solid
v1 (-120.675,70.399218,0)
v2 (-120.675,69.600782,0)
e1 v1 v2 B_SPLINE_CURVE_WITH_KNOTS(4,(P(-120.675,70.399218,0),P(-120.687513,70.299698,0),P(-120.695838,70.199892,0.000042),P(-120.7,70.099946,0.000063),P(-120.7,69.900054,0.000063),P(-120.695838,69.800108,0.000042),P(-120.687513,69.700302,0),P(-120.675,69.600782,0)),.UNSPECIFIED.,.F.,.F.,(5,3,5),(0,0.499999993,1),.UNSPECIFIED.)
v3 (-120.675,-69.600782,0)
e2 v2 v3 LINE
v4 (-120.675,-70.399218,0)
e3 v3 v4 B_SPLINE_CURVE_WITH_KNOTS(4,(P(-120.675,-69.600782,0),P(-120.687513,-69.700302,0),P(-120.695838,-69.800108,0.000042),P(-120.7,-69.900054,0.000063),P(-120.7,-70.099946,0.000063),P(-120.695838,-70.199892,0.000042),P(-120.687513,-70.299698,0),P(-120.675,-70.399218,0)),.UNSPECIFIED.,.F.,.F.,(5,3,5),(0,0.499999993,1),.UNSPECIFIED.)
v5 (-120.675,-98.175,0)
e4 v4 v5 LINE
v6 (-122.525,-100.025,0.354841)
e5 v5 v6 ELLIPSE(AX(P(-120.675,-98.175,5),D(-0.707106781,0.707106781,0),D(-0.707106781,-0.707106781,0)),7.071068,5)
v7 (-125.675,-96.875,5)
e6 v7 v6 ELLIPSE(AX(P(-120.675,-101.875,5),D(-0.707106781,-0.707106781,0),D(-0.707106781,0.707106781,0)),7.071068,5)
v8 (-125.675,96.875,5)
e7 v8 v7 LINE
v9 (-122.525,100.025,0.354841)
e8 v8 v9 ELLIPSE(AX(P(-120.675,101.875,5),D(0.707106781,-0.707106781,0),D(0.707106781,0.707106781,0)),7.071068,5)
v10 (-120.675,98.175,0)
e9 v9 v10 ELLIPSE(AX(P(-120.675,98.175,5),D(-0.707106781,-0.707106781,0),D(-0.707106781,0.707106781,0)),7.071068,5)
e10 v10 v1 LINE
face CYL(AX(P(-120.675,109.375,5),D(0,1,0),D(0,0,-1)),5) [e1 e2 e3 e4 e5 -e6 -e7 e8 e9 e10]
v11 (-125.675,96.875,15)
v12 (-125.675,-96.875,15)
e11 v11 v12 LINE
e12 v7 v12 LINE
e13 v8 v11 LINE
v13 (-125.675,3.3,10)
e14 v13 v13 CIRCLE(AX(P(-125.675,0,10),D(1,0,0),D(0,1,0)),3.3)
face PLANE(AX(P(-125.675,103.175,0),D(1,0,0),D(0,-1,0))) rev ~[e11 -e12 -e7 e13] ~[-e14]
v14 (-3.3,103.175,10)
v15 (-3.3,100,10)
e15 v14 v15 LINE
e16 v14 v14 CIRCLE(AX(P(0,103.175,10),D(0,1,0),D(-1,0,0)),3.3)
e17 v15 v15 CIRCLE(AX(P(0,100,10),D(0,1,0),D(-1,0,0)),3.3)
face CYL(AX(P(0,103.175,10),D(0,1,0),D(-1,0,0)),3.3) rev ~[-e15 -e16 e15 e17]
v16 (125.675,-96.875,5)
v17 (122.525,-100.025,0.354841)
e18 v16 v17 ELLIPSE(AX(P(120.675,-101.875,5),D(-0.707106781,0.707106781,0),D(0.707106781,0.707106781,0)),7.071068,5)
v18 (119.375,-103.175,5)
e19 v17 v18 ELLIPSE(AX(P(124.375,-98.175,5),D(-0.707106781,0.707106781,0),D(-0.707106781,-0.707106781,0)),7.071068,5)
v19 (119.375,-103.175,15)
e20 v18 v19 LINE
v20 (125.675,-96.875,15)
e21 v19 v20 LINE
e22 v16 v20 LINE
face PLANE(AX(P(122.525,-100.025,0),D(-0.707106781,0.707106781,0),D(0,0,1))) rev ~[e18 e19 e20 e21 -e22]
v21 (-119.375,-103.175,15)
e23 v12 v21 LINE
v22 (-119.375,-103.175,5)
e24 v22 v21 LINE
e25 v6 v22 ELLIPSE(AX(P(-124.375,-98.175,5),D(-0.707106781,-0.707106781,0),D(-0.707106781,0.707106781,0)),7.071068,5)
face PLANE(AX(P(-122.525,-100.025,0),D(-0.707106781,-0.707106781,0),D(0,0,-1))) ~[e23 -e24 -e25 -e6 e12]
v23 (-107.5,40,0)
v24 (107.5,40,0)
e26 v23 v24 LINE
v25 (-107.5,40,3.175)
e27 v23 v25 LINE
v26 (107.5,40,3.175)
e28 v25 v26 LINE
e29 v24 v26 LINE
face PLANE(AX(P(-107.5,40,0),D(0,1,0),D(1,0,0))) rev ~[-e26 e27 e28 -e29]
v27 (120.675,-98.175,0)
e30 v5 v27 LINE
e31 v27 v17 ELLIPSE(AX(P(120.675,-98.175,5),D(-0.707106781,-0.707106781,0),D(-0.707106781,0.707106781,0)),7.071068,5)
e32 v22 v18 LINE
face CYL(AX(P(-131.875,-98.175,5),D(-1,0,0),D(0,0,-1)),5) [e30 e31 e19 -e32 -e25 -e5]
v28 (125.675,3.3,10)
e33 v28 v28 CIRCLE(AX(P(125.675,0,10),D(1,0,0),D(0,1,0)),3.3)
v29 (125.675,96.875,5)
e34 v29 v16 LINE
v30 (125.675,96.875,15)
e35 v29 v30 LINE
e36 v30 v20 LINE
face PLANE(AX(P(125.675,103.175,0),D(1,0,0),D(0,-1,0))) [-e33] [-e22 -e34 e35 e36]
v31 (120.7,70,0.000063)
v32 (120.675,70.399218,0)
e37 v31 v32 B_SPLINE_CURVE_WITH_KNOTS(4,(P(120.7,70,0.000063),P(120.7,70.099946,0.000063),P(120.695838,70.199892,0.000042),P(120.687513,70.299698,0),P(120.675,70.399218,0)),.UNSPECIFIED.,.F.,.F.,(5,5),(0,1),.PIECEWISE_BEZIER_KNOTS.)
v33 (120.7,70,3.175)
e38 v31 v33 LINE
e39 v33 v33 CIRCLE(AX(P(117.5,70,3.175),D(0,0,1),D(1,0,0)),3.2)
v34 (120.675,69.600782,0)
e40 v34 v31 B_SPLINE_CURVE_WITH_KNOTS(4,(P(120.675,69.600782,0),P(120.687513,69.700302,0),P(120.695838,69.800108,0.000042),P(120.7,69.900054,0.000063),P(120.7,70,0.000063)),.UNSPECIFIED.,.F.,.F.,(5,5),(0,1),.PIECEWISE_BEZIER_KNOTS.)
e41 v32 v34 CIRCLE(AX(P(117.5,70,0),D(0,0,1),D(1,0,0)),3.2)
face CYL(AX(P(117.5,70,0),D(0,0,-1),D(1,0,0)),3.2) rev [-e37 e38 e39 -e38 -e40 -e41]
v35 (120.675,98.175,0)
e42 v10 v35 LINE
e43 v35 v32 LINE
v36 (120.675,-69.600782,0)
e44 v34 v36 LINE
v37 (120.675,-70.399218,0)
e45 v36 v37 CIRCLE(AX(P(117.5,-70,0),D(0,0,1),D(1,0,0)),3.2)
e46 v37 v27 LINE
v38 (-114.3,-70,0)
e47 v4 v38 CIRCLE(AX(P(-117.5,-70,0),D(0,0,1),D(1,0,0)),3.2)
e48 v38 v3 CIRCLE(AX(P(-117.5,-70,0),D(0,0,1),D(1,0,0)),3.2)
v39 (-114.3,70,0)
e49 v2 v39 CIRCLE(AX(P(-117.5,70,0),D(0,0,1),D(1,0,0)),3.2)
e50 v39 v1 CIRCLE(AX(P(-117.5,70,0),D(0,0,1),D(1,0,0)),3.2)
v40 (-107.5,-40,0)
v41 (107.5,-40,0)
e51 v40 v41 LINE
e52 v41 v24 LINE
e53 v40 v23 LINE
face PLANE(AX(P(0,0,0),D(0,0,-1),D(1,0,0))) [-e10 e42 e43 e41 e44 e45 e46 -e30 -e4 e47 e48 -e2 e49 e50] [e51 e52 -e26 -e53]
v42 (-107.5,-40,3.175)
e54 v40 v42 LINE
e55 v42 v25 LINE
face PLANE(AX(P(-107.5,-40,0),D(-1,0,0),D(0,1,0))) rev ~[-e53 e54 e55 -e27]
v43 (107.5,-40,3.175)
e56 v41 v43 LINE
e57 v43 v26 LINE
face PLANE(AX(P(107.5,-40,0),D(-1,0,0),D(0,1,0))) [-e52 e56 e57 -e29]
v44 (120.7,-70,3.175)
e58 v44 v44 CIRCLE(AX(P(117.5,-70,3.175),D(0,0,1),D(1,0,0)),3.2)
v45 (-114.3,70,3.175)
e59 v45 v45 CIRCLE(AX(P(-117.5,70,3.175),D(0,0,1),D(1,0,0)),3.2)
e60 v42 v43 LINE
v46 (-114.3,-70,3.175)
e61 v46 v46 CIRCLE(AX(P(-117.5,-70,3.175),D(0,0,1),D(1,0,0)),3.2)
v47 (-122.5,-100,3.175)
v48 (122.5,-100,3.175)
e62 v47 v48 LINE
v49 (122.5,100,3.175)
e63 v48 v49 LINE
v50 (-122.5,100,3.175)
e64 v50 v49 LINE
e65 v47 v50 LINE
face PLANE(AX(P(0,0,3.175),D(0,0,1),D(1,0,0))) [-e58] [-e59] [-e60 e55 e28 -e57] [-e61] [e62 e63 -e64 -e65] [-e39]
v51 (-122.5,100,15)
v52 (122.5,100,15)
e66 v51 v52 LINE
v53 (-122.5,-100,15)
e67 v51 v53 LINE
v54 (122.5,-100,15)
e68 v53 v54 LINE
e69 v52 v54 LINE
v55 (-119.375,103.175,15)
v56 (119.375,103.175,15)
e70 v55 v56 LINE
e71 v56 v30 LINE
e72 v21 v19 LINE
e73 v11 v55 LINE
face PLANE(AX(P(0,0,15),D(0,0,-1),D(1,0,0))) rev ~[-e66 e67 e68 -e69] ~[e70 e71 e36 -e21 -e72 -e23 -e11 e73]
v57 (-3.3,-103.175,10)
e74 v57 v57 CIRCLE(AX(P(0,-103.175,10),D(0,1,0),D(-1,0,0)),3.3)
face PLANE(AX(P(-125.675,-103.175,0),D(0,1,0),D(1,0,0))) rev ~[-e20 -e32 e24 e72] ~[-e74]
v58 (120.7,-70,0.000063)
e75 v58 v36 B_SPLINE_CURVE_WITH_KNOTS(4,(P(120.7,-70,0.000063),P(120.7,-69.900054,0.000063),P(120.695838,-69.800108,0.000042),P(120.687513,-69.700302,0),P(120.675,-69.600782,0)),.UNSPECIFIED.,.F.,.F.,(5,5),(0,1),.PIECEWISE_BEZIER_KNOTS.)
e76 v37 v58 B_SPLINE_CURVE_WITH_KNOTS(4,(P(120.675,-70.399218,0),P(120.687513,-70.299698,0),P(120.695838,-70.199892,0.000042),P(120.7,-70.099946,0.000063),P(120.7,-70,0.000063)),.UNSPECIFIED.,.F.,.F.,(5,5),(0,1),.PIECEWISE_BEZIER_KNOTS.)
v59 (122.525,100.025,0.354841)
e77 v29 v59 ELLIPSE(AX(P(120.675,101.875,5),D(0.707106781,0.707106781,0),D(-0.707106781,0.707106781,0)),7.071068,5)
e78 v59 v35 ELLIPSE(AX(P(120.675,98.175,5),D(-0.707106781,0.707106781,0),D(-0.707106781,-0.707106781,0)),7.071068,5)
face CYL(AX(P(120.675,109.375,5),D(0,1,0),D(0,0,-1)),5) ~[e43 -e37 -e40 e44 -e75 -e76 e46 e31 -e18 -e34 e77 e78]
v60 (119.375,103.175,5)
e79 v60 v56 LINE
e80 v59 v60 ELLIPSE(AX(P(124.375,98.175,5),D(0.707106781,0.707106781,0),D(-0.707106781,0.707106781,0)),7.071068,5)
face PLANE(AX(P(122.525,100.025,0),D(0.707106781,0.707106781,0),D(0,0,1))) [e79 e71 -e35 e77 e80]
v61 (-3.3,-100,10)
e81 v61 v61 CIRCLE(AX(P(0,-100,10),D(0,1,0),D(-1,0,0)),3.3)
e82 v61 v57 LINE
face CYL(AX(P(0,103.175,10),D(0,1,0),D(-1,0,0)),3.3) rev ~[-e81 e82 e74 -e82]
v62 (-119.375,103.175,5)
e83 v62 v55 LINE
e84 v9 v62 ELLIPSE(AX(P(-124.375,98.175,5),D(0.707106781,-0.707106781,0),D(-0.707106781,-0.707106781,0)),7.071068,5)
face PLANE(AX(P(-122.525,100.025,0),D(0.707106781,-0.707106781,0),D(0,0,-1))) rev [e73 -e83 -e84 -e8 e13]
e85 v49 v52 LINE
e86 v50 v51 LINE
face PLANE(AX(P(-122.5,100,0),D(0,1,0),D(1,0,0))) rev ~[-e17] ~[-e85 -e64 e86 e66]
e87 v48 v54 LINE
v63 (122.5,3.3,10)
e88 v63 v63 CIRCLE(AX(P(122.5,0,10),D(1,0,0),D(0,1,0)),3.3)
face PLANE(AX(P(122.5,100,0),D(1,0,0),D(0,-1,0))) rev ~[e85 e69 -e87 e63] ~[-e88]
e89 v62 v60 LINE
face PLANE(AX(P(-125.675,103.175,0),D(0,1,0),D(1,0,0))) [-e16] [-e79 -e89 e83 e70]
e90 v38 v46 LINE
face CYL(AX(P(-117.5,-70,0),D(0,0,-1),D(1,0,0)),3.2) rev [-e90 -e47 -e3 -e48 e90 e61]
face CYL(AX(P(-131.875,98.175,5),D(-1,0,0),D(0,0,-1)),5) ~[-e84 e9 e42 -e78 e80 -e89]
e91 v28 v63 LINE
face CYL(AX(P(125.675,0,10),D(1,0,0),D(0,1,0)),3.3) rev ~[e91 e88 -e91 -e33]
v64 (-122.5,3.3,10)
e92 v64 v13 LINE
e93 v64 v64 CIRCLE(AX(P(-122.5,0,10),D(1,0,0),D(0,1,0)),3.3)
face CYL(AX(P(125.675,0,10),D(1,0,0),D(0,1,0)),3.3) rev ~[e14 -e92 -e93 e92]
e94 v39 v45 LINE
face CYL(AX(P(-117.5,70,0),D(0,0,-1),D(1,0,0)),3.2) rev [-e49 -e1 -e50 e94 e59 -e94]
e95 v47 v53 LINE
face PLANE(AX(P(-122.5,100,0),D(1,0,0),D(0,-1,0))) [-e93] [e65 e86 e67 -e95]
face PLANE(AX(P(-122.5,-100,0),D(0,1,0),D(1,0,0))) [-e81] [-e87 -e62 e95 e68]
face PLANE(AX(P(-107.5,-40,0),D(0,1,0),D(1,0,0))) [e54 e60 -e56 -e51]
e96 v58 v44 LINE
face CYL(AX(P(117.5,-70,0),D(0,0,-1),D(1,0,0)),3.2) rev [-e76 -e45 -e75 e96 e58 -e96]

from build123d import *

# Parameters (mm, degrees)
F0_W         = 245
F0_H         = 200
F0_R         = 3.2
F0_W_2       = 215
F0_H_2       = 80
F1_DEPTH     = 3.175
F2_W         = 251.35
F2_H         = 206.35
F2_W_2       = 245
F2_H_2       = 200
F3_DEPTH     = 15
F4_SIZE      = 6.3
F6_R         = 3.3
F7_DEPTH     = 251.351
F8_R         = 3.3
F9_DEPTH     = 206.351
F10_T1_DEPTH = 263.75
F10_T3_DEPTH = 218.75


# Not quite as in the source:
# - a fillet or chamfer that OpenCascade refuses, or shapes differently, is made with other operations: its cross-section is extruded or revolved along the edge and cut away or added


with BuildPart() as f1:
    # F0 (on Top) → F1 (new body)
    with BuildSketch(Plane.XY):
        Rectangle(F0_W, F0_H)
        with Locations((-117.5, -70)):
            Circle(F0_R, mode=Mode.SUBTRACT)
        with Locations((117.5, -70)):
            Circle(F0_R, mode=Mode.SUBTRACT)
        with Locations((-117.5, 70)):
            Circle(F0_R, mode=Mode.SUBTRACT)
        Rectangle(F0_W_2, F0_H_2, mode=Mode.SUBTRACT)
        with Locations((117.5, 70)):
            Circle(F0_R, mode=Mode.SUBTRACT)
    extrude(amount=F1_DEPTH)

    # F2 (on face) → F3 (join)
    with BuildSketch(Plane(origin=(0, 0, 0), x_dir=(1, 0, 0), z_dir=(0, 0, -1))):
        Rectangle(F2_W, F2_H)
        Rectangle(F2_W_2, F2_H_2, mode=Mode.SUBTRACT)
    extrude(amount=-F3_DEPTH)

    # F4
    f4_edges = [f1.edges().sort_by_distance(p)[0] for p in [
        (-125.675, 103.175, 7.5),
        (125.675, 103.175, 7.5),
        (125.675, -103.175, 7.5),
        (-125.675, -103.175, 7.5),
    ]]
    chamfer(f4_edges, length=F4_SIZE)

    # F6 (on face) → F7 (cut, through all)
    with BuildSketch(Plane.YZ.offset(125.675)):
        with Locations((0, 10)):
            Circle(F6_R)
    extrude(amount=-F7_DEPTH, mode=Mode.SUBTRACT)

    # F8 (on face) → F9 (cut, through all)
    with BuildSketch(Plane(origin=(0, 103.175, 0), x_dir=(-1, 0, 0), z_dir=(0, 1, 0))):
        with Locations((0, 10)):
            Circle(F8_R)
    extrude(amount=-F9_DEPTH, mode=Mode.SUBTRACT)

    # F10: fillet of radius 5 on 4 edges, made by hand

    # F10_s2 → F10_t1 (cut)
    with BuildSketch(Plane.YZ.offset(-131.875)):
        with BuildLine():
            ThreePointArc((-98.175, 0), (-101.7105339059, 1.4644660941), (-103.175, 5))
            Line((-103.175, 5), (-103.175, 0))
            Line((-103.175, 0), (-98.175, 0))
        make_face()
        with BuildLine():
            ThreePointArc((98.175, 0), (101.7105339059, 1.4644660941), (103.175, 5))
            Line((103.175, 5), (103.175, 0))
            Line((103.175, 0), (98.175, 0))
        make_face()
    extrude(amount=F10_T1_DEPTH, mode=Mode.SUBTRACT)

    # F10_s4 → F10_t3 (cut)
    with BuildSketch(Plane.XZ.offset(-109.375)):
        with BuildLine():
            ThreePointArc((-120.675, 0), (-124.2105339059, 1.4644660941), (-125.675, 5))
            Line((-125.675, 5), (-125.675, 0))
            Line((-125.675, 0), (-120.675, 0))
        make_face()
        with BuildLine():
            ThreePointArc((120.675, 0), (124.2105339059, 1.4644660941), (125.675, 5))
            Line((125.675, 5), (125.675, 0))
            Line((125.675, 0), (120.675, 0))
        make_face()
    extrude(amount=F10_T3_DEPTH, mode=Mode.SUBTRACT)


solid = f1.part
